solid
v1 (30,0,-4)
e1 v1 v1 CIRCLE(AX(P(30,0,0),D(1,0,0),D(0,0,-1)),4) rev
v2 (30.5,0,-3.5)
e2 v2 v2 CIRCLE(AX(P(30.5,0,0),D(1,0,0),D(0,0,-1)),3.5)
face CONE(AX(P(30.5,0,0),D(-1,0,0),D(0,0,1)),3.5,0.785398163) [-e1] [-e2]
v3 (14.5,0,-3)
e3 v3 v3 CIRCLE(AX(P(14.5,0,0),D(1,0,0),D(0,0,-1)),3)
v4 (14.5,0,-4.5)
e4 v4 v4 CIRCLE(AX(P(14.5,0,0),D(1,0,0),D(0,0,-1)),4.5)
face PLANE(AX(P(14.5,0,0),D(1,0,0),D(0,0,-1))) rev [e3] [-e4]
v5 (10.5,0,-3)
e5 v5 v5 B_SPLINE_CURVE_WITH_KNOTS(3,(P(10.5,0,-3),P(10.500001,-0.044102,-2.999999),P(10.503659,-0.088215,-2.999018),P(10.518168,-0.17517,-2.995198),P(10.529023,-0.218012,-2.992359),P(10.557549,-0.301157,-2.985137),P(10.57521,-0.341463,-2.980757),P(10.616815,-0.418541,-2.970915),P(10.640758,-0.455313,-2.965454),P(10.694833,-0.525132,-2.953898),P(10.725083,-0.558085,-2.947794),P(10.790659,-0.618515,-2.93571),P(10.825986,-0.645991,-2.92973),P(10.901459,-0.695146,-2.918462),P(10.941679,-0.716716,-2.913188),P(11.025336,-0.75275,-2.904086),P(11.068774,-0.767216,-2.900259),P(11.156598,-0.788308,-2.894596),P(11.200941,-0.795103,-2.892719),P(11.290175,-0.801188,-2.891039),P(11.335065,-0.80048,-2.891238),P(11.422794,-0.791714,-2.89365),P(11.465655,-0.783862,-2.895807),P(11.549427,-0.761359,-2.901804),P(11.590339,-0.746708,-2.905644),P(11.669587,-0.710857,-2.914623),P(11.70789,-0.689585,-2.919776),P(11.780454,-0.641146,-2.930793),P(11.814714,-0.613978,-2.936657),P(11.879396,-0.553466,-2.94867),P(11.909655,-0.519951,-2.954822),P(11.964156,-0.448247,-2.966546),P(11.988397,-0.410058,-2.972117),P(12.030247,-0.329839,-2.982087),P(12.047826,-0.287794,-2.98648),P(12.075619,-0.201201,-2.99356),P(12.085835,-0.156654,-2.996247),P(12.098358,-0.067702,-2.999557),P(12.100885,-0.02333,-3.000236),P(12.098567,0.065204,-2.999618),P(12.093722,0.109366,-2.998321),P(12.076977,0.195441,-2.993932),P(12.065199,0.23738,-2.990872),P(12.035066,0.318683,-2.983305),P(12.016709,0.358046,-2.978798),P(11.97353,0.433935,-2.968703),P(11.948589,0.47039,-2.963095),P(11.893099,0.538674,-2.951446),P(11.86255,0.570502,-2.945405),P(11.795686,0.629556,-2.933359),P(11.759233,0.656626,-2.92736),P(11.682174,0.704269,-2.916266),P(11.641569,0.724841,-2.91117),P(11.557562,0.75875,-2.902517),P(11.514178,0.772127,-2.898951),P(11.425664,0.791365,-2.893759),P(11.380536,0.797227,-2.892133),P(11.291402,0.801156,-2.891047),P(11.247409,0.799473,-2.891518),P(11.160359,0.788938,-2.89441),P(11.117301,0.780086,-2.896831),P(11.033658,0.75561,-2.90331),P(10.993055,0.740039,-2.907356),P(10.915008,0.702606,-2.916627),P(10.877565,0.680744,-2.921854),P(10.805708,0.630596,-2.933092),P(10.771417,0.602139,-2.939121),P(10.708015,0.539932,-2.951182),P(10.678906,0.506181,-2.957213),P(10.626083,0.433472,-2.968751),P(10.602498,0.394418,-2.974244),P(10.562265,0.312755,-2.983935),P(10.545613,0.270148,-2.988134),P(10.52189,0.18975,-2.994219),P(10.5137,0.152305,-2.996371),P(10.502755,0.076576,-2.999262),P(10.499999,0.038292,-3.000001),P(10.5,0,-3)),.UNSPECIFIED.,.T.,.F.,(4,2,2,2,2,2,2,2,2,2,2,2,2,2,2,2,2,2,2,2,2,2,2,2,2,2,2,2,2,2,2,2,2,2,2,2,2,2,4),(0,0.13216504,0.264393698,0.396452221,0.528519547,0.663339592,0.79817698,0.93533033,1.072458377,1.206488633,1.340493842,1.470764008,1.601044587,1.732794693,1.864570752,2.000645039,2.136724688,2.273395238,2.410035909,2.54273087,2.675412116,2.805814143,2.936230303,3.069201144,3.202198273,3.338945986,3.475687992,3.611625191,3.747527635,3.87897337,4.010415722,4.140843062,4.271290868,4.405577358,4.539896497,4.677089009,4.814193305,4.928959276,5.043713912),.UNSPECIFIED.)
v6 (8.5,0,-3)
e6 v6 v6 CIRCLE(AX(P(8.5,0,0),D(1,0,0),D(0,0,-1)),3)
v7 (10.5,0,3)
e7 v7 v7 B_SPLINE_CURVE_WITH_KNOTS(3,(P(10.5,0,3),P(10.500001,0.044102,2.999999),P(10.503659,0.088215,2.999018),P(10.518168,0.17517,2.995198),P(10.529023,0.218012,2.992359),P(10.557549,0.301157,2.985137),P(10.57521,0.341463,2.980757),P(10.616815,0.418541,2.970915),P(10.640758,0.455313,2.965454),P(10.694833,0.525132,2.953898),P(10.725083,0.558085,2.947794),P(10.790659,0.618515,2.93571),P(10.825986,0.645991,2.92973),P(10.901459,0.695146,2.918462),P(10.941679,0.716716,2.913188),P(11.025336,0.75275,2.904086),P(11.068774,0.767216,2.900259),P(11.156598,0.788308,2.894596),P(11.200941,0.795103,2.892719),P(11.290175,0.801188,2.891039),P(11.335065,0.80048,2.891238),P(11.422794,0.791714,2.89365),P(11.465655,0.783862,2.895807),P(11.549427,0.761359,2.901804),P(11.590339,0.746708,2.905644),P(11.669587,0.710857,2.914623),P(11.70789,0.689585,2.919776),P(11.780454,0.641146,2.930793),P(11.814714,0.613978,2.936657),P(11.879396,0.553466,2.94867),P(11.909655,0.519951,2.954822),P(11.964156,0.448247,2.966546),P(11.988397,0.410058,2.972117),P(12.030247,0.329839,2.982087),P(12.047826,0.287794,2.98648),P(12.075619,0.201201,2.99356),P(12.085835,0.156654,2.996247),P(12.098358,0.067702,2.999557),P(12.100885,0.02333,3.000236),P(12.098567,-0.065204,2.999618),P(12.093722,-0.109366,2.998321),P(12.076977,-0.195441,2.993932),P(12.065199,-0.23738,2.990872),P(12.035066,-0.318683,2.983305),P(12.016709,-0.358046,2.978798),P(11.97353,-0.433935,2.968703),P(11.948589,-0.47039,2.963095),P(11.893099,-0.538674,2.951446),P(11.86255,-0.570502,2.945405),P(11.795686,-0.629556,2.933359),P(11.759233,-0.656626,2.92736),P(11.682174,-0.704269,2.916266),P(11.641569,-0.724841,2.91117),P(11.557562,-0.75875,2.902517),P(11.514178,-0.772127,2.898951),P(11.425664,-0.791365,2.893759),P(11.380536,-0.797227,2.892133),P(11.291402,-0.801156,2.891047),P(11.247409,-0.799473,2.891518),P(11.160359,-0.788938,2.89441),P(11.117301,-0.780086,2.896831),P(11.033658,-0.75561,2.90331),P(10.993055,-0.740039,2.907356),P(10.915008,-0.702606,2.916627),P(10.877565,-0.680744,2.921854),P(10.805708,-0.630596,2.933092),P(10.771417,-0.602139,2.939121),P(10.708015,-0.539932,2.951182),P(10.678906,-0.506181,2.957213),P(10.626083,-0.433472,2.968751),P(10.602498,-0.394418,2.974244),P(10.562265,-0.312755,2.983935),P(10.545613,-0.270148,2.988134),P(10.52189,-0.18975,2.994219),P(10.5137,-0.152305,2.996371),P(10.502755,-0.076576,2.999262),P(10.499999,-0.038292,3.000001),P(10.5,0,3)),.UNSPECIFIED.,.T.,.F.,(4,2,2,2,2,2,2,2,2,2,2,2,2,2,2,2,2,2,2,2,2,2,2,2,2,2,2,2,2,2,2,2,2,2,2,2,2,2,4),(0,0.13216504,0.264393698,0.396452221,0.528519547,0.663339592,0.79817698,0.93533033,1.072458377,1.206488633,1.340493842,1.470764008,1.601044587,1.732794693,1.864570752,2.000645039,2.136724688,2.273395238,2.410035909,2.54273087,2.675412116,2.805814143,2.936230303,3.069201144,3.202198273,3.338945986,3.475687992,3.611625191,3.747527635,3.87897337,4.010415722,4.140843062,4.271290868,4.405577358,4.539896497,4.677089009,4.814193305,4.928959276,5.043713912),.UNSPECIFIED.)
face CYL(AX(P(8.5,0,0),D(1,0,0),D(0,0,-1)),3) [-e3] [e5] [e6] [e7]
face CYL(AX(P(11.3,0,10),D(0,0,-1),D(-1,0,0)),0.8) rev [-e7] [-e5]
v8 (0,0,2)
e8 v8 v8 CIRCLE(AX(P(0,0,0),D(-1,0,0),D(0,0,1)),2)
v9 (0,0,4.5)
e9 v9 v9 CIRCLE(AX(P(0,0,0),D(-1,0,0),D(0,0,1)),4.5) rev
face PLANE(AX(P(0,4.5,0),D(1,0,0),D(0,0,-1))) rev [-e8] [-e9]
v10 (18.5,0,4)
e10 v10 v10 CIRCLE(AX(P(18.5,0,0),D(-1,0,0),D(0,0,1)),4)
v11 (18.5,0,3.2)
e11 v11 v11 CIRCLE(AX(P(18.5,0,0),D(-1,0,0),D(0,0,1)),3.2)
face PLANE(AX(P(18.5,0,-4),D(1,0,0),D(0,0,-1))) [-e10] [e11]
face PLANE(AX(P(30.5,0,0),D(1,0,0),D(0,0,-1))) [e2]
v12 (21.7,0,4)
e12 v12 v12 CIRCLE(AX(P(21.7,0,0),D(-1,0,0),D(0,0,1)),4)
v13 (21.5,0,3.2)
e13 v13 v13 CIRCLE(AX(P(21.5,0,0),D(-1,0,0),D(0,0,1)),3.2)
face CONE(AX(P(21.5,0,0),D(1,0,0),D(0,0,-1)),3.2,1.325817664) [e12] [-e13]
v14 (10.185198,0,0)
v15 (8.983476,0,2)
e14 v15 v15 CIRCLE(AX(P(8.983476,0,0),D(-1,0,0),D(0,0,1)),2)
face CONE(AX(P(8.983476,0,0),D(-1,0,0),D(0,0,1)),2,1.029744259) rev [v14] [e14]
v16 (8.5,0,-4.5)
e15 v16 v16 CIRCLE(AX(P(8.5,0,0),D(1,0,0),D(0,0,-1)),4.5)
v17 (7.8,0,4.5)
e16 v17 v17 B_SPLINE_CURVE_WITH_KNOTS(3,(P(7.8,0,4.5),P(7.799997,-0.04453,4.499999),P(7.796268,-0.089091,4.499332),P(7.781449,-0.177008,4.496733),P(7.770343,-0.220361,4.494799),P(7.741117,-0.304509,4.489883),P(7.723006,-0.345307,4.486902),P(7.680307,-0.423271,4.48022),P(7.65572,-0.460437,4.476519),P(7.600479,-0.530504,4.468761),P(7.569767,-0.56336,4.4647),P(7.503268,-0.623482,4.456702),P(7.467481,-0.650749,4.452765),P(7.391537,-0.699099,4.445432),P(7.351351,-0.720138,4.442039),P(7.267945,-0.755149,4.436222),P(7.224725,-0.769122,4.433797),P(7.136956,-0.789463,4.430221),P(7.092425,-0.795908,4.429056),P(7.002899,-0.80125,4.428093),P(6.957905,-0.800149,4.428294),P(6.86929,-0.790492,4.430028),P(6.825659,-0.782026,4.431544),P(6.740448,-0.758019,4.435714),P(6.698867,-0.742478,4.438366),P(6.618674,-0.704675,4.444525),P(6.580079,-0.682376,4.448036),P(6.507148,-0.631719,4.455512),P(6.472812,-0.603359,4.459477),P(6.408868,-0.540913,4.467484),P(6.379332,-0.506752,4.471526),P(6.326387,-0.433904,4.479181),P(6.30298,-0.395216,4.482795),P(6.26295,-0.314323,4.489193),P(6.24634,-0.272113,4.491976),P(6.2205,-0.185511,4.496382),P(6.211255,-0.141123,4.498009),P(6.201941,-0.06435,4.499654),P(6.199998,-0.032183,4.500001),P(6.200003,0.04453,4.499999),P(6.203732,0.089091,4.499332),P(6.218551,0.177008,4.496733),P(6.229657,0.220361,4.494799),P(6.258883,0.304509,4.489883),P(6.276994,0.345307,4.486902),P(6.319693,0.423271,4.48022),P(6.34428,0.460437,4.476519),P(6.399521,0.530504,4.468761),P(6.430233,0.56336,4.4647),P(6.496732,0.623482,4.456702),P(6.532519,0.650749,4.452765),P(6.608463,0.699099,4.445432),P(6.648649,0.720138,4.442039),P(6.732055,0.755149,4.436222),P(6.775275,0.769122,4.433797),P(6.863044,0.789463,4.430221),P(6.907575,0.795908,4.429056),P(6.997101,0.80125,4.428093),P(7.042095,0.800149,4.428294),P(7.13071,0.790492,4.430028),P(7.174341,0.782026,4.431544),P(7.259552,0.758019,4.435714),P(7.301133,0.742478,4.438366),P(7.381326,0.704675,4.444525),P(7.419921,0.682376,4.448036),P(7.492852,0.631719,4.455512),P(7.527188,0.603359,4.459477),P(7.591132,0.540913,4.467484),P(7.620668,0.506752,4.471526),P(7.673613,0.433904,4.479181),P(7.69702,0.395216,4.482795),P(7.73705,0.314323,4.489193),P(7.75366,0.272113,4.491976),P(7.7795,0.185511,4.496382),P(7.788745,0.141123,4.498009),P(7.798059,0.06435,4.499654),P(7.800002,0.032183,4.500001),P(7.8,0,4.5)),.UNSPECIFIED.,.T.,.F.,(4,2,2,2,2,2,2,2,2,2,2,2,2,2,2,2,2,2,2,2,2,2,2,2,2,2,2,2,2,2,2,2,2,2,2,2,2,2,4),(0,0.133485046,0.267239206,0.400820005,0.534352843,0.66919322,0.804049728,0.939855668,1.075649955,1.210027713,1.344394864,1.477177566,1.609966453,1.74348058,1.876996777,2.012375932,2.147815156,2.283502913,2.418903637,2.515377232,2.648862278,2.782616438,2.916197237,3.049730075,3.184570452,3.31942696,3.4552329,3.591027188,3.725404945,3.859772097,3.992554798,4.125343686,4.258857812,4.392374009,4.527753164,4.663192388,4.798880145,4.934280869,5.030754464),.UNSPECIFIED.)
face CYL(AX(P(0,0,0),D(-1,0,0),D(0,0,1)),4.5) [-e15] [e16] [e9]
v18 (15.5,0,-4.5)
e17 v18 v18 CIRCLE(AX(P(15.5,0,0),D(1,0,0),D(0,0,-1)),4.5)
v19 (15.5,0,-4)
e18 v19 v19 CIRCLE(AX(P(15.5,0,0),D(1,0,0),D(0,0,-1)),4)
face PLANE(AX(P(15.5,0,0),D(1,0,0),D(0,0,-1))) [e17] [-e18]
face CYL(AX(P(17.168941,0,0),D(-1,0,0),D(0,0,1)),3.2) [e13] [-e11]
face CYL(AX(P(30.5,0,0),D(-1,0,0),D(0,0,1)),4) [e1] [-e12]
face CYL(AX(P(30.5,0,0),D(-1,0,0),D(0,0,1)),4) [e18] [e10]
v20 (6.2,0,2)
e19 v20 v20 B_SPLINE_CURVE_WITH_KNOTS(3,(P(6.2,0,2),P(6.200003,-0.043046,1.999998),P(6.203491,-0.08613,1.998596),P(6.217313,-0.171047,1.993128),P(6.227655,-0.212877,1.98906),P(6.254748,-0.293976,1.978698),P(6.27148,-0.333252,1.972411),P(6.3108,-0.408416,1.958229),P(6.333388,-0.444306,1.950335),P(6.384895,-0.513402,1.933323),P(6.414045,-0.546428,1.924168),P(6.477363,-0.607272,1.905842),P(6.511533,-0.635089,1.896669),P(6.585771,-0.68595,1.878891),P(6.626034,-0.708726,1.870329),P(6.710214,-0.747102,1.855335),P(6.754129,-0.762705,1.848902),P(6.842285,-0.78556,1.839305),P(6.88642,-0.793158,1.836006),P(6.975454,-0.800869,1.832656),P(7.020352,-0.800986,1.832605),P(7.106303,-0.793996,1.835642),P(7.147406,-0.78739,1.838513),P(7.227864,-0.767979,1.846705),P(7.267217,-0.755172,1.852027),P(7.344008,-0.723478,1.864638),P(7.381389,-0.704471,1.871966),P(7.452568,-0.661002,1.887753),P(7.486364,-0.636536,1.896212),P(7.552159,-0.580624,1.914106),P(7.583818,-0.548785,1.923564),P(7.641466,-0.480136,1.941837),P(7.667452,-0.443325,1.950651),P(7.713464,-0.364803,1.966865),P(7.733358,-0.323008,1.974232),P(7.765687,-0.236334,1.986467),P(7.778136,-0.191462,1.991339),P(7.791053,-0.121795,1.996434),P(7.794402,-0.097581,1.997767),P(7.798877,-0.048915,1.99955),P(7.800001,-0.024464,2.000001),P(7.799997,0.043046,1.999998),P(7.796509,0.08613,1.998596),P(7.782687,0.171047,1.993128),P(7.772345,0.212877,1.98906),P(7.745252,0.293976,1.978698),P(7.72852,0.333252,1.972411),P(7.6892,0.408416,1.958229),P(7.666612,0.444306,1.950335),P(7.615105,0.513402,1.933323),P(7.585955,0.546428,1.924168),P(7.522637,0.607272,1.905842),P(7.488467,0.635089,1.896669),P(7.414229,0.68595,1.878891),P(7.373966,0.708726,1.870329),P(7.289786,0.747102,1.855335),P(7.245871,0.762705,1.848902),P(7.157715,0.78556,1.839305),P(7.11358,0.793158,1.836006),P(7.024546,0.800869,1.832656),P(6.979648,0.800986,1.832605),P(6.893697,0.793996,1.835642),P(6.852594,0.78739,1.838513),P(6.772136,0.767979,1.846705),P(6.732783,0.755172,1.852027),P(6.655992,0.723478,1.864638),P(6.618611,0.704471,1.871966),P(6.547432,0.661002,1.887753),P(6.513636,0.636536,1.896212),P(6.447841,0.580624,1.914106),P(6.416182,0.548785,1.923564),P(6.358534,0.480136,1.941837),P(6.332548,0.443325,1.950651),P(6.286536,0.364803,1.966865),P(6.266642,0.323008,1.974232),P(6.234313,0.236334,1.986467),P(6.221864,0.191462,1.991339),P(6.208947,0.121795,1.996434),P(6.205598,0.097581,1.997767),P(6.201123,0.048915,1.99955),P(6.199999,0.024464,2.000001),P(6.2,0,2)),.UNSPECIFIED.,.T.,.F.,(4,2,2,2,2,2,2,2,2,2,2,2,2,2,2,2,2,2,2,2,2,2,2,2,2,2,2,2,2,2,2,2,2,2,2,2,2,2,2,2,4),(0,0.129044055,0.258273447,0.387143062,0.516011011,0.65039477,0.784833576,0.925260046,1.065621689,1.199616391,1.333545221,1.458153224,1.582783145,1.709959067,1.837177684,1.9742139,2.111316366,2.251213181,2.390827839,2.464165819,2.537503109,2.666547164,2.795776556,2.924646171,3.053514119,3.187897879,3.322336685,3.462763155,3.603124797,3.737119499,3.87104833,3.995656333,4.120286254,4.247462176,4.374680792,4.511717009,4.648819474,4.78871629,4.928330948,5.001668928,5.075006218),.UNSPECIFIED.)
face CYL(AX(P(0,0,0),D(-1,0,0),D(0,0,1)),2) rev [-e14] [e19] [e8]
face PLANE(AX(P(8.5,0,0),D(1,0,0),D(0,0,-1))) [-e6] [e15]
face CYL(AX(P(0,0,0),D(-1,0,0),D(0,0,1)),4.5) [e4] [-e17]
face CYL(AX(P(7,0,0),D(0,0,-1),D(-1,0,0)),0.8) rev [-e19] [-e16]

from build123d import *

# Parameters (mm, degrees)
FL_CHE_START                         = -6
FL_CHE_VERSCHIEBEN1_2_OUTLINE_R      = 1.25
FL_CHE_VERSCHIEBEN1_2_DEPTH          = 12
FL_CHE_START_2                       = 1.833034949
FL_CHE_VERSCHIEBEN1_3_OUTLINE_R      = 0.8
FL_CHE_VERSCHIEBEN1_3_DEPTH          = 4.166965051
SCHNITT_LINEAR_AUSTRAGEN1_DEPTH      = 20
SCHNITT_LINEAR_AUSTRAGEN1_DEPTH_BACK = 4.5
SKIZZE1_R                            = 4.5
SKIZZE2_R                            = 4
AUFSATZ_LINEAR_AUSTRAGEN1_DEPTH      = 15
SCHNITT_LINEAR_START                 = -1
SKIZZE3_R                            = 4.5
SKIZZE3_R_2                          = 3
SCHNITT_LINEAR_AUSTRAGEN2_DEPTH      = 6
FASE1_SIZE                           = 0.5
SCHNITT_LINEAR_AUSTRAGEN3_DEPTH      = 10
SCHNITT_LINEAR_AUSTRAGEN3_DEPTH_BACK = 10
SKIZZE5_R                            = 0.8


with BuildPart() as part:
    # Fläche verschieben1: read off the stored shape, not the designer's step
    # Fläche verschieben1 outline → Fläche verschieben1 (revolve)
    with BuildSketch(Plane.YX):
        with BuildLine():
            ThreePointArc((1.75, 26.8), (1.808578644, 26.941421356), (1.95, 27))
            Line((1.95, 27), (2, 27))
            Line((2, 27), (2, 33.85))
            Line((2, 33.85), (1.85, 34))
            Line((1.85, 34), (0, 34))
            Line((0, 34), (0, 10.18519763))
            Line((0, 10.18519763), (2, 8.983476392))
            Line((2, 8.983476392), (2, 0))
            Line((2, 0), (4.5, 0))
            Line((4.5, 0), (4.5, 20))
            Line((4.5, 20), (3, 20))
            Line((3, 20), (3, 26))
            Line((3, 26), (1.95, 26))
            ThreePointArc((1.95, 26), (1.808578644, 26.058578644), (1.75, 26.2))
            Line((1.75, 26.2), (1.75, 26.8))
        make_face()
    revolve(axis=Axis((0, 0, 0), (1, 0, 0)))

    # Fl_che verschieben1 2 outline → Fl_che verschieben1 2 (cut)
    with BuildSketch(Plane.XY.offset(FL_CHE_START)):
        with Locations((17, 0)):
            Circle(FL_CHE_VERSCHIEBEN1_2_OUTLINE_R)
    extrude(amount=FL_CHE_VERSCHIEBEN1_2_DEPTH, mode=Mode.SUBTRACT)

    # Fl_che verschieben1 3 outline → Fl_che verschieben1 3 (cut)
    with BuildSketch(Plane.XY.offset(FL_CHE_START_2)):
        with Locations((7, 0)):
            Circle(FL_CHE_VERSCHIEBEN1_3_OUTLINE_R)
    extrude(amount=FL_CHE_VERSCHIEBEN1_3_DEPTH, mode=Mode.SUBTRACT)

    # Skizze1 → Schnitt-Linear austragen1 (cut, two sides: drawn at the far end of the back side and taken through both)
    with BuildSketch(Plane(origin=(20, 0, 0), x_dir=(0, 0, -1), z_dir=(1, 0, 0)).offset(-SCHNITT_LINEAR_AUSTRAGEN1_DEPTH_BACK)):
        with Locations(Location((0, 0, 0), (0, 0, 180))):
            Circle(SKIZZE1_R)
    extrude(amount=SCHNITT_LINEAR_AUSTRAGEN1_DEPTH + SCHNITT_LINEAR_AUSTRAGEN1_DEPTH_BACK, mode=Mode.SUBTRACT)

    # Skizze2 → Aufsatz-Linear austragen1 (add)
    with BuildSketch(Plane(origin=(15.5, 0, 0), x_dir=(0, 0, -1), z_dir=(1, 0, 0))):
        Circle(SKIZZE2_R)
    extrude(amount=AUFSATZ_LINEAR_AUSTRAGEN1_DEPTH)

    # Skizze3 → Schnitt-Linear austragen2 (cut)
    with BuildSketch(Plane(origin=(15.5, 0, 0), x_dir=(0, 0, -1), z_dir=(1, 0, 0)).offset(SCHNITT_LINEAR_START)):
        with Locations(Location((0, 0, 0), (0, 0, 180))):
            Circle(SKIZZE3_R)
        Circle(SKIZZE3_R_2, mode=Mode.SUBTRACT)
    extrude(amount=-SCHNITT_LINEAR_AUSTRAGEN2_DEPTH, mode=Mode.SUBTRACT)

    # Skizze4 → Schnitt-Rotation1 (revolve, cut)
    with BuildSketch(Plane(origin=(0, 0, 0), x_dir=(1, 0, 0), z_dir=(0, 1, 0)), mode=Mode.PRIVATE) as schnitt_rotation1_sk:
        Polygon((18.5, 4), (18.5, 3.2), (21.5, 3.2), (21.7, 4), align=None)
    revolve(schnitt_rotation1_sk.sketch.rotate(Axis((17.168940626, 0, 0), (1, 0, 0)), 180), axis=Axis((17.168940626, 0, 0), (1, 0, 0)), mode=Mode.SUBTRACT)

    # Fase1
    fase1_edges = [part.edges().sort_by_distance(p)[0] for p in [
        (30.5, 0, 4),
    ]]
    chamfer(fase1_edges, length=FASE1_SIZE)

    # Skizze5 → Schnitt-Linear austragen3 (cut, two sides: drawn at the far end of the back side and taken through both)
    with BuildSketch(Plane.XY.offset(-SCHNITT_LINEAR_AUSTRAGEN3_DEPTH_BACK)):
        with Locations(Location((11.3, 0, 0), (0, 0, 180))):
            Circle(SKIZZE5_R)
    extrude(amount=SCHNITT_LINEAR_AUSTRAGEN3_DEPTH + SCHNITT_LINEAR_AUSTRAGEN3_DEPTH_BACK, mode=Mode.SUBTRACT)


solid = part.part
